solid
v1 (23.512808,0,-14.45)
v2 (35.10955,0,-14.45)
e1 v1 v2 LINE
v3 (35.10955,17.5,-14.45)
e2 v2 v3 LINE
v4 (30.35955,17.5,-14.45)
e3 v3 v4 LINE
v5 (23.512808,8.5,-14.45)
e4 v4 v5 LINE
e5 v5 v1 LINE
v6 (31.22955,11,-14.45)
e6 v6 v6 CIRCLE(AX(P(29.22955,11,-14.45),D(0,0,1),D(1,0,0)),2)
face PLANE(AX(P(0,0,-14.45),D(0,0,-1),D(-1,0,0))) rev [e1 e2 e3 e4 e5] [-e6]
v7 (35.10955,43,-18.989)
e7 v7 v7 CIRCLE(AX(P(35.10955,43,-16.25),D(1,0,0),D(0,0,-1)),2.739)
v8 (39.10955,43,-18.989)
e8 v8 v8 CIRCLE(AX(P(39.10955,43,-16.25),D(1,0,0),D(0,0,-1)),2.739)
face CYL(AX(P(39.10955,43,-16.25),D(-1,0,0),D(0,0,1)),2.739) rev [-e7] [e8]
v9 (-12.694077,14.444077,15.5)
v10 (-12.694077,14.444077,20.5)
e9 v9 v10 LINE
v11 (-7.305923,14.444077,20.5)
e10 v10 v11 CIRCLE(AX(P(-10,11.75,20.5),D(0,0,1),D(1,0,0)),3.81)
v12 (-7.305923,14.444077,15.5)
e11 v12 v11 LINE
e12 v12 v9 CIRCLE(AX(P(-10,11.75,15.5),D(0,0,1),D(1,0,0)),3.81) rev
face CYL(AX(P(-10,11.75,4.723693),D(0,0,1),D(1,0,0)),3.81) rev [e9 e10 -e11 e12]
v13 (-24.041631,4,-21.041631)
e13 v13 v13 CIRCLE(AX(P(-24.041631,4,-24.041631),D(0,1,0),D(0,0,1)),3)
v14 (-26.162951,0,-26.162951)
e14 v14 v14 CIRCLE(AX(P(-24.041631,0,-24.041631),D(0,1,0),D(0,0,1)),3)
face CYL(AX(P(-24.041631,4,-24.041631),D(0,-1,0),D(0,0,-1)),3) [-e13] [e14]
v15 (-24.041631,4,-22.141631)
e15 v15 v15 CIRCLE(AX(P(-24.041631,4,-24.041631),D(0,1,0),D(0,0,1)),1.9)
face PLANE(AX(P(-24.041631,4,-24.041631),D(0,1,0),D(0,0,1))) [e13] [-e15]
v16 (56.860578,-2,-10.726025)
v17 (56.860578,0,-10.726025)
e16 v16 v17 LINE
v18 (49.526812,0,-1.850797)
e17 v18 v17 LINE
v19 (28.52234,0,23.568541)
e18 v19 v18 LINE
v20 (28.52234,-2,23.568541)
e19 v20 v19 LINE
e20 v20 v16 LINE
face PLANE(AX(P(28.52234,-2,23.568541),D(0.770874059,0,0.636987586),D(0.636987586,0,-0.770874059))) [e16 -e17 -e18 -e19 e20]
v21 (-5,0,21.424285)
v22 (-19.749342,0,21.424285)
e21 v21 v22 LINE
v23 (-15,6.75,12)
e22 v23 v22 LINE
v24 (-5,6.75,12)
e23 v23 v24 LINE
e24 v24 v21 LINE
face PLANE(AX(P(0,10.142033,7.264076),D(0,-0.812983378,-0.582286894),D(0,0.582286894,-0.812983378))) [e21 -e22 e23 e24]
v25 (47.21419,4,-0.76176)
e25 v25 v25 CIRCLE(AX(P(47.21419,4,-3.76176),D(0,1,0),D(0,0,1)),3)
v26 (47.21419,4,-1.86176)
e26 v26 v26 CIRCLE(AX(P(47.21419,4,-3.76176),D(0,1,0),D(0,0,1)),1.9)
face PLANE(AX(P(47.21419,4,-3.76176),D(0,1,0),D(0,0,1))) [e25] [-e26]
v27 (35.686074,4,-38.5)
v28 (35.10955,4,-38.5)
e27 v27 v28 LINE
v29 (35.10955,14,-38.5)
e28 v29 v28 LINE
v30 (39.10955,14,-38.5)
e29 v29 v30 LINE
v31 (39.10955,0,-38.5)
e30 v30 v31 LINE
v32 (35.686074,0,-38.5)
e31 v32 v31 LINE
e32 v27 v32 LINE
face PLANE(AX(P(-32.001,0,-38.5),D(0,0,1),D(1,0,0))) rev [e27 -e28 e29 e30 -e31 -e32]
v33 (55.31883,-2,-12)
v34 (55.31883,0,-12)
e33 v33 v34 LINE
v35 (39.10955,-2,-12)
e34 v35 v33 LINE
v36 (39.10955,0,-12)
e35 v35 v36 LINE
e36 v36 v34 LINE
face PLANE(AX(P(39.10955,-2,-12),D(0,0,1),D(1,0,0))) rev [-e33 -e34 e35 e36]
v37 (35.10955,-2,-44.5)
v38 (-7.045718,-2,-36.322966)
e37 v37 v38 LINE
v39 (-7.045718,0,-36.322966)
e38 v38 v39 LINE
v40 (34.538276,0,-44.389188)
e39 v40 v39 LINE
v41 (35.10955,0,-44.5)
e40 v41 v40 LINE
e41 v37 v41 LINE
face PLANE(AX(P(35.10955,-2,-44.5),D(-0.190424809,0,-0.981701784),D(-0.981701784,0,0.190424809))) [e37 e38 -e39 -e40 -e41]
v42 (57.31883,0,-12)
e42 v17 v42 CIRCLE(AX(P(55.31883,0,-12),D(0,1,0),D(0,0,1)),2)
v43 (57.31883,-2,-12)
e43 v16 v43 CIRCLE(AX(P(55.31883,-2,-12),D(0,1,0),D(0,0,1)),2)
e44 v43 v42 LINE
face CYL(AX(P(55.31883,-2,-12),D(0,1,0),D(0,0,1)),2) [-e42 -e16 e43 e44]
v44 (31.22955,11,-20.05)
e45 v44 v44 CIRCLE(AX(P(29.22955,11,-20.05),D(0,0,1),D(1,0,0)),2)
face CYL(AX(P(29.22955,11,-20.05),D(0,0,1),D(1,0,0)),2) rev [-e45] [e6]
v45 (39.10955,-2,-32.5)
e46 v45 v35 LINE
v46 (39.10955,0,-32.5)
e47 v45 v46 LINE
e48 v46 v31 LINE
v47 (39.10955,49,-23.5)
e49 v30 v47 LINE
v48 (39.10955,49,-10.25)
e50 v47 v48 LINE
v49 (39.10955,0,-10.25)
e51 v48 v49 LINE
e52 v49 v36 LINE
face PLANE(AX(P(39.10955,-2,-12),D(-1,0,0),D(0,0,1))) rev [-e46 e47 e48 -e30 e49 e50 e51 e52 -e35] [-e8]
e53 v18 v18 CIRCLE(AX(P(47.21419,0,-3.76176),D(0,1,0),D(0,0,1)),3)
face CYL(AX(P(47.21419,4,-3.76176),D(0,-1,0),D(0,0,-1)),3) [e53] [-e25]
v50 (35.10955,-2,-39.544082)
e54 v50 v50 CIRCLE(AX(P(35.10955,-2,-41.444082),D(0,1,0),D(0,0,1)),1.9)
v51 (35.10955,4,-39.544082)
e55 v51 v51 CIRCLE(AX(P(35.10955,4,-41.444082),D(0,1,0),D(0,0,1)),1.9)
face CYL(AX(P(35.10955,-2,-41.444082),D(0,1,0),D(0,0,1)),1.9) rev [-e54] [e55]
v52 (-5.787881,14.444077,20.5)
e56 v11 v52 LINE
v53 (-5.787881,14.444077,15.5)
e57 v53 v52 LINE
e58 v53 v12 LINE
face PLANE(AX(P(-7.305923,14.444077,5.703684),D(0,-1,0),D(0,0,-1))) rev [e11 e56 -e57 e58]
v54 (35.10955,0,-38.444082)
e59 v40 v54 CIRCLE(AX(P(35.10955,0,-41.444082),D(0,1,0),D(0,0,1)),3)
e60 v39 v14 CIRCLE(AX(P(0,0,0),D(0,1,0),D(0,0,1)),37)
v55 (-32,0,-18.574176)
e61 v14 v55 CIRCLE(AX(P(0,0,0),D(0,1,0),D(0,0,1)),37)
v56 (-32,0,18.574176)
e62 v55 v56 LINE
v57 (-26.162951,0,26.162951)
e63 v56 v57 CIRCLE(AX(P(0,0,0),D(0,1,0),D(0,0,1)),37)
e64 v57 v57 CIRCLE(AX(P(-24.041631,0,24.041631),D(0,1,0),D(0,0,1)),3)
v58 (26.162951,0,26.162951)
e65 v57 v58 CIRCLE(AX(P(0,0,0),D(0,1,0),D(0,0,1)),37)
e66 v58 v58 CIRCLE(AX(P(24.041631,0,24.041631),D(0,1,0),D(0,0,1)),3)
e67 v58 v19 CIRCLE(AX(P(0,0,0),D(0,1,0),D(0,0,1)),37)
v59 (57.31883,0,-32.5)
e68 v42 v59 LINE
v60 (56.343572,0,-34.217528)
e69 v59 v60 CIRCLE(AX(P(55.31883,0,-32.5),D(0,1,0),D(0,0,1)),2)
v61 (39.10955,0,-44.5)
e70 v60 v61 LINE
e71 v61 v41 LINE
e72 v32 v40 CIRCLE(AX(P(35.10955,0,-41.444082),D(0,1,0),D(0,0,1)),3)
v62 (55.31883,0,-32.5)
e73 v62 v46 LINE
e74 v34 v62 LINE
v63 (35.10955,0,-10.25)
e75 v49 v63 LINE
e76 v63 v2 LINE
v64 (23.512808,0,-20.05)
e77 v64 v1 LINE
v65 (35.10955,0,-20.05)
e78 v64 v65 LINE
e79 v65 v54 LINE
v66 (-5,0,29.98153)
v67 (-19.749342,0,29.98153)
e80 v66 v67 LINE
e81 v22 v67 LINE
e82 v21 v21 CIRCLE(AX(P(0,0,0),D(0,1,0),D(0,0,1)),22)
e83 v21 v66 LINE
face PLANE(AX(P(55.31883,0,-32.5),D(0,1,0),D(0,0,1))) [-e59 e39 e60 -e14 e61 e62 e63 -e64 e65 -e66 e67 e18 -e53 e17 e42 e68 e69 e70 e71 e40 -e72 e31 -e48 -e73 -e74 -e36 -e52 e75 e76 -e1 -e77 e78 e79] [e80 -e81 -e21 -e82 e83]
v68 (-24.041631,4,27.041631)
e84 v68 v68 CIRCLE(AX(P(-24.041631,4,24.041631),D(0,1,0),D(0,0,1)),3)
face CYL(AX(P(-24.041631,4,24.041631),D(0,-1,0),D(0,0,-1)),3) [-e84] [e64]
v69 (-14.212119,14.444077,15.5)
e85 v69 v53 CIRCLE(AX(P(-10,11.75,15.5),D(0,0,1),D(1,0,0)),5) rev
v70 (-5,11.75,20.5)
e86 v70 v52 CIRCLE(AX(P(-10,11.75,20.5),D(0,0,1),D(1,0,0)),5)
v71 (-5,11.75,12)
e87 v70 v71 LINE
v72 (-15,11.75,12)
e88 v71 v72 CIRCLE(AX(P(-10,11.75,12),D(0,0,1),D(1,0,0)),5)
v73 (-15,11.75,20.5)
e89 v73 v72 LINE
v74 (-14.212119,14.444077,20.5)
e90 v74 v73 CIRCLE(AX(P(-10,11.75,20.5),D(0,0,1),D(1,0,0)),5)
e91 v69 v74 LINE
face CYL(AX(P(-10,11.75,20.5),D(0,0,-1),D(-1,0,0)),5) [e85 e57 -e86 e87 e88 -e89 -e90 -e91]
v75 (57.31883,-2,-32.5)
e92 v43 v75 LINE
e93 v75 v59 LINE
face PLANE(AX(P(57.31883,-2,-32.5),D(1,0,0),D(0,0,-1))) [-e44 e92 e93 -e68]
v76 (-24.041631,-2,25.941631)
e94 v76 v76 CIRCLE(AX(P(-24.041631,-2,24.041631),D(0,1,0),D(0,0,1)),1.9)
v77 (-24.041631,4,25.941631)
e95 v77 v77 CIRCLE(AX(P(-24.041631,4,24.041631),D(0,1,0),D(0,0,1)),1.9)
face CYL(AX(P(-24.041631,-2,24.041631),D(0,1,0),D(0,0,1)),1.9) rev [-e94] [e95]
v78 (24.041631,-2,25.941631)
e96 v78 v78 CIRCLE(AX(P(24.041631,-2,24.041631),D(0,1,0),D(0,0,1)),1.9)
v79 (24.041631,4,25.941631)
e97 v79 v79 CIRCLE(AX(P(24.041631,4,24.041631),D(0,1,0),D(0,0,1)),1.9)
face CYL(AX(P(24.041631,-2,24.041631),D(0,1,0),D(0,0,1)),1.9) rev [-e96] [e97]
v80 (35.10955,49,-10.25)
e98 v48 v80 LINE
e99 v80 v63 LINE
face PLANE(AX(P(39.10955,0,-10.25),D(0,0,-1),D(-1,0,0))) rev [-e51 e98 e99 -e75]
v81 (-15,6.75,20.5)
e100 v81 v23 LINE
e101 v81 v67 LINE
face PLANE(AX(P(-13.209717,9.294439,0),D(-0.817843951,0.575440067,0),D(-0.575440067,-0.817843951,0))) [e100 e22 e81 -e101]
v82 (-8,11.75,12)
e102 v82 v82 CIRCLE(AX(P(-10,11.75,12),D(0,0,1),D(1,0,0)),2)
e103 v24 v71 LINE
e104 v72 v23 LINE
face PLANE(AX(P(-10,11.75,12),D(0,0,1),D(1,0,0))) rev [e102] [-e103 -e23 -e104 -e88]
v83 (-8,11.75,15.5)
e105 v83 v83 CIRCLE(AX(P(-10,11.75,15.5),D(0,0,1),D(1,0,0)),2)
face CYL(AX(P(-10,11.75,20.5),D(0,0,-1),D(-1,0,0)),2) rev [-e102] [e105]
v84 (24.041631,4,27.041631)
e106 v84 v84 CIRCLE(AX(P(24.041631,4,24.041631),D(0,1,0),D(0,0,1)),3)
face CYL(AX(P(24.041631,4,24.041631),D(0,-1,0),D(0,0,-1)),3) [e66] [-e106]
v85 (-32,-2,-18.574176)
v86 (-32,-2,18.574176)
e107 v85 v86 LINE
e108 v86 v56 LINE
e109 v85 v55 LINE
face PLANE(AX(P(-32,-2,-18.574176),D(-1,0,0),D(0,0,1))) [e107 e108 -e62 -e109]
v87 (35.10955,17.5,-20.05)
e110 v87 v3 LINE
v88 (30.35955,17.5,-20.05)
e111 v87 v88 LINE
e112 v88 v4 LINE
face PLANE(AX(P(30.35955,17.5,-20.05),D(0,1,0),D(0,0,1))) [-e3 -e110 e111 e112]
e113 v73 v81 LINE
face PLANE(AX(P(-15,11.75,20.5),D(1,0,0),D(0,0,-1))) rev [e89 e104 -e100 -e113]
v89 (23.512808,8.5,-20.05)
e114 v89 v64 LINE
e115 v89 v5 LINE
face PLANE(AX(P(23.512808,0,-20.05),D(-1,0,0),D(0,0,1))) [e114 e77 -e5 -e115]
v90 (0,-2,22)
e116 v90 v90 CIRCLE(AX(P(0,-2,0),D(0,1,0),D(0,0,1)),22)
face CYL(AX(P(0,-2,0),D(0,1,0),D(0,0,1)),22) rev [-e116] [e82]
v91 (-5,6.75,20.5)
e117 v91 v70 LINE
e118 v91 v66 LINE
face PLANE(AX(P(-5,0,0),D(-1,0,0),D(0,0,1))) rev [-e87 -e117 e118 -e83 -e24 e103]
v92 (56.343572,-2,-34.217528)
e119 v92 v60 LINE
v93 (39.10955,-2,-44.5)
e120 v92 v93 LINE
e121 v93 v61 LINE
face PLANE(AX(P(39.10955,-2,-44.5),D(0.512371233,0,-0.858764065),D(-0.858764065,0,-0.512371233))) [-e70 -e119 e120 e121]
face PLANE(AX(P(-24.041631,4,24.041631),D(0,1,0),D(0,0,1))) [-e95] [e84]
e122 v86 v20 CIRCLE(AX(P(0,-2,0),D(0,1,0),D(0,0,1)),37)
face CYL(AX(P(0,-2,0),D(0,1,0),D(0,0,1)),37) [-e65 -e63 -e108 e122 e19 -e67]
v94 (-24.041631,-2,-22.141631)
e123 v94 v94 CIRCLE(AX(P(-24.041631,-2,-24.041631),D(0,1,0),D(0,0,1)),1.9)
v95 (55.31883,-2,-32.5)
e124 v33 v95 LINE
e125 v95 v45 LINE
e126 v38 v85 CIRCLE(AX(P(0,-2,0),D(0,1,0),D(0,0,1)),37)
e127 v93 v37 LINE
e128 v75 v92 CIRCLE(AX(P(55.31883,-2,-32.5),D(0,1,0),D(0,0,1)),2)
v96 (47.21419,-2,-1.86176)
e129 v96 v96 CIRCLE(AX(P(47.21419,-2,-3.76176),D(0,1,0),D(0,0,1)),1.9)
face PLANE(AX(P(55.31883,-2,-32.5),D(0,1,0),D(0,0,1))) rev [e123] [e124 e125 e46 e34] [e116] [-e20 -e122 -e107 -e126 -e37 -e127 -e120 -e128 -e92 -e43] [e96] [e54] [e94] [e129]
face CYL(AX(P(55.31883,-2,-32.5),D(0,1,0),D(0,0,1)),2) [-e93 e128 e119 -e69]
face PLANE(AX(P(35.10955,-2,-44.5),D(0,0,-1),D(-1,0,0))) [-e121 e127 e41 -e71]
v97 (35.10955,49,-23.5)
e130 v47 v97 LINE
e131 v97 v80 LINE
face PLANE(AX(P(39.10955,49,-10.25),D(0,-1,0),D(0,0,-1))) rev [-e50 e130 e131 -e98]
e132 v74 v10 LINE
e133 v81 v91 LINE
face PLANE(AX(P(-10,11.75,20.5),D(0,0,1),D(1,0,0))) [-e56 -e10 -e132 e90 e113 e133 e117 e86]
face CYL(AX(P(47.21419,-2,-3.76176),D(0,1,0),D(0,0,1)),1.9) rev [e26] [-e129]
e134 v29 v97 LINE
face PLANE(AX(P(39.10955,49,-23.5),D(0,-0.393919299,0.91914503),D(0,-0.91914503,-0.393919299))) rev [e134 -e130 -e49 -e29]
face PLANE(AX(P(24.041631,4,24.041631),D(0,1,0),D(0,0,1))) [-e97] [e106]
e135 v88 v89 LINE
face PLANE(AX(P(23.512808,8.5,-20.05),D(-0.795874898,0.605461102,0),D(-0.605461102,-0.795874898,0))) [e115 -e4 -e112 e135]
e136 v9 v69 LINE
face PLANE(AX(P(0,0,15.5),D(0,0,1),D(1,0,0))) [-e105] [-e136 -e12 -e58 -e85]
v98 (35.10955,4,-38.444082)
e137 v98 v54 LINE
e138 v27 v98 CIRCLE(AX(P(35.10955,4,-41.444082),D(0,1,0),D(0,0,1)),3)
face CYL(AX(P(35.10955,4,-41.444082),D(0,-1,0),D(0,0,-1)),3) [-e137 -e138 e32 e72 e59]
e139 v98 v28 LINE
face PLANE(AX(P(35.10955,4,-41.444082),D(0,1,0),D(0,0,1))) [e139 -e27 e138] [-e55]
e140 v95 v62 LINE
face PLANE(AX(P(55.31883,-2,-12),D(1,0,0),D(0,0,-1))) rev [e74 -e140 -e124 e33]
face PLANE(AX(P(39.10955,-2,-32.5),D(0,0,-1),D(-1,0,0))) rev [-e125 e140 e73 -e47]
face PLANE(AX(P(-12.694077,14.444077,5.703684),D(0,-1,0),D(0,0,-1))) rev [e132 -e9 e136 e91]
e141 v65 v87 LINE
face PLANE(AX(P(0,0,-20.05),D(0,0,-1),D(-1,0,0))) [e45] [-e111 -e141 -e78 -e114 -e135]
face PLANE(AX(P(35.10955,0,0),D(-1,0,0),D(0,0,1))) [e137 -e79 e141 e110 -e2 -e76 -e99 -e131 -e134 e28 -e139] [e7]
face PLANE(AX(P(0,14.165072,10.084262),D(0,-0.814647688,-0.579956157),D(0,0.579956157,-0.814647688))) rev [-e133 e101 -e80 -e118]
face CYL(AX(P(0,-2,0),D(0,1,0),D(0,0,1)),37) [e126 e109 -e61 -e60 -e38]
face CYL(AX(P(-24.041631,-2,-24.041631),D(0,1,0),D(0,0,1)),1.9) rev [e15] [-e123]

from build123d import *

# Parameters (mm, degrees)
SKETCH2_R                = 22
SKETCH2_W                = 16.20928
SKETCH2_H                = 20.5
BOSS_EXTRUDE1_DEPTH      = 2
SKETCH6_R                = 2
BOSS_EXTRUDE3_DEPTH      = 5.6
SKETCH7_R                = 2.739
BOSS_EXTRUDE4_DEPTH      = 4
BOSS_EXTRUDE5_DEPTH      = 5
BOSS_EXTRUDE5_DEPTH_BACK = 3.5
SKETCH9_R                = 2
LOFT4_START              = -19.749341788
LOFT4_DEPTH              = 14.749341788
LOFT4_START_2            = 11
LOFT4_2_DEPTH            = 20
CUT_EXTRUDE1_START       = -5
SKETCH11_R               = 3.81
CUT_EXTRUDE1_DEPTH       = 5
CUT_EXTRUDE2_REACH       = 99.148
SKETCH12_R               = 3
BOSS_EXTRUDE9_DEPTH      = 4
SKETCH14_R               = 1.9
CUT_EXTRUDE3_DEPTH       = 86.385585859
CUT_EXTRUDE5_START       = -5
CUT_EXTRUDE5_DEPTH       = 5


with BuildPart() as part:
    # Sketch2 → Boss-Extrude1 (new body)
    with BuildSketch(Plane(origin=(0, 0, 0), x_dir=(1, 0, 0), z_dir=(0, 1, 0))):
        with BuildLine():
            Line((35.10955, 44.5), (-7.045717951, 36.322965993))
            ThreePointArc((-7.045717951, 36.322965993), (-21.445207215, 30.151336413), (-32, 18.574175621))
            Line((-32, 18.574175621), (-32, -18.574175621))
            ThreePointArc((-32, -18.574175621), (-3.042934445, -36.874659998), (28.522340191, -23.568540685))
            Line((28.522340191, -23.568540685), (56.860578118, 10.726024828))
            ThreePointArc((56.860578118, 10.726024828), (57.200783272, 11.323056958), (57.31883, 12))
            Line((57.31883, 12), (57.31883, 32.5))
            ThreePointArc((57.31883, 32.5), (57.058008676, 33.487551282), (56.343572466, 34.21752813))
            Line((56.343572466, 34.21752813), (39.10955, 44.5))
            Line((39.10955, 44.5), (35.10955, 44.5))
        make_face()
        with Locations(Location((0, 0, 0), (0, 0, 270))):
            Circle(SKETCH2_R, mode=Mode.SUBTRACT)
        with Locations((47.21419, 22.25)):
            Rectangle(SKETCH2_W, SKETCH2_H, mode=Mode.SUBTRACT)
    extrude(amount=-BOSS_EXTRUDE1_DEPTH)

    # Sketch6 → Boss-Extrude3 (add)
    with BuildSketch(Plane.XY.offset(-14.45)):
        Polygon((23.512808221, 0), (23.512808221, 8.5), (30.35955, 17.5), (35.10955, 17.5), (35.10955, 0), align=None)
        with Locations((29.22955, 11)):
            Circle(SKETCH6_R, mode=Mode.SUBTRACT)
    extrude(amount=-BOSS_EXTRUDE3_DEPTH)

    # Sketch7 → Boss-Extrude4 (add)
    with BuildSketch(Plane(origin=(35.10955, 0, 0), x_dir=(0, 0, -1), z_dir=(1, 0, 0))):
        Polygon((44.5, 0), (10.25, 0), (10.25, 49), (23.5, 49), align=None)
        with Locations((16.25, 43)):
            Circle(SKETCH7_R, mode=Mode.SUBTRACT)
    extrude(amount=BOSS_EXTRUDE4_DEPTH)



with BuildPart() as body_2:
    # Sketch9 → Boss-Extrude5 (new, two sides: drawn at the far end of the back side and taken through both)
    with BuildSketch(Plane.XY.offset(15.5).offset(-BOSS_EXTRUDE5_DEPTH_BACK)):
        with BuildLine():
            Line((-15, 11.75), (-15, 6.75))
            Line((-15, 6.75), (-10, 6.75))
            Line((-10, 6.75), (-5, 6.75))
            Line((-5, 6.75), (-5, 11.75))
            ThreePointArc((-5, 11.75), (-10, 16.75), (-15, 11.75))
        make_face()
        with Locations((-10, 11.75)):
            Circle(SKETCH9_R, mode=Mode.SUBTRACT)
    extrude(amount=BOSS_EXTRUDE5_DEPTH + BOSS_EXTRUDE5_DEPTH_BACK)


with BuildPart() as part_1:
    add(part.part)

    add(body_2.part)  # Loft4 merges body 2
    # Loft4: read off the stored shape, not the designer's step
    # Loft4 outline → Loft4 (add)
    with BuildSketch(Plane.YZ.offset(LOFT4_START)):
        Polygon((6.75, 20.5), (0, 29.981530337), (0, 21.424285286), (6.75, 12), align=None)
    extrude(amount=LOFT4_DEPTH)

    # Loft4 2 outline → Loft4 2 (cut)
    with BuildSketch(Plane.XY.offset(LOFT4_START_2)):
        Polygon((-19.749341788, 0), (-15, 6.75), (-19.749341788, 6.75), align=None)
    extrude(amount=LOFT4_2_DEPTH, mode=Mode.SUBTRACT)

    # Sketch11 → Cut-Extrude1 (cut)
    with BuildSketch(Plane.XY.offset(20.5).offset(CUT_EXTRUDE1_START)):
        with Locations((-10, 11.75)):
            Circle(SKETCH11_R)
    extrude(amount=CUT_EXTRUDE1_DEPTH, mode=Mode.SUBTRACT)

    # Sketch13 → Cut-Extrude2 (cut, up to next)
    with BuildSketch(Plane(origin=(39.10955, 0, 0), x_dir=(0, 0, -1), z_dir=(1, 0, 0)), mode=Mode.PRIVATE) as cut_extrude2_sk1:
        Polygon((44.5, 0), (38.5, 0), (38.5, 14), align=None)
    cut_extrude2_tool1 = extrude(cut_extrude2_sk1.sketch, amount=-CUT_EXTRUDE2_REACH, mode=Mode.PRIVATE) & part_1.part
    add(cut_extrude2_tool1.solids().sort_by_distance((39.10955, 4.666667, -40.5))[0], mode=Mode.SUBTRACT)

    # Sketch12 → Boss-Extrude9 (add)
    with BuildSketch(Plane(origin=(0, 0, 0), x_dir=(1, 0, 0), z_dir=(0, 1, 0))):
        with Locations(Location((-24.04163056, 24.04163056, 0), (0, 0, 134.999512051))):
            Circle(SKETCH12_R)
        with Locations(Location((-24.04163056, -24.04163056, 0), (0, 0, 224.999512051))):
            Circle(SKETCH12_R)
        with Locations(Location((24.04163056, -24.04163056, 0), (0, 0, 314.999512068))):
            Circle(SKETCH12_R)
        with Locations(Location((47.21419, 3.761759805, 0), (0, 0, 320.432443614))):
            Circle(SKETCH12_R)
        with Locations((35.10955, 41.444082154)):
            Circle(SKETCH12_R)
    extrude(amount=BOSS_EXTRUDE9_DEPTH)

    # Sketch14 → Cut-Extrude3 (cut, through all)
    with BuildSketch(Plane(origin=(0, 4, 0), x_dir=(1, 0, 0), z_dir=(0, 1, 0))):
        with Locations(Location((-24.04163056, 24.04163056, 0), (0, 0, 270))):
            Circle(SKETCH14_R)
        with Locations(Location((35.10955, 41.444082154, 0), (0, 0, 270))):
            Circle(SKETCH14_R)
        with Locations(Location((47.21419, 3.761759805, 0), (0, 0, 270))):
            Circle(SKETCH14_R)
        with Locations(Location((24.04163056, -24.04163056, 0), (0, 0, 270))):
            Circle(SKETCH14_R)
        with Locations(Location((-24.04163056, -24.04163056, 0), (0, 0, 270))):
            Circle(SKETCH14_R)
    extrude(amount=-CUT_EXTRUDE3_DEPTH, mode=Mode.SUBTRACT)

    # Sketch18 → Cut-Extrude5 (cut)
    with BuildSketch(Plane.XY.offset(20.5).offset(CUT_EXTRUDE5_START)):
        with BuildLine():
            Line((-10, 11.75), (-12.694076836, 14.444076836))
            Line((-12.694076836, 14.444076836), (-14.212119419, 14.444076836))
            ThreePointArc((-14.212119419, 14.444076836), (-10, 16.75), (-5.787880581, 14.444076836))
            Line((-5.787880581, 14.444076836), (-7.305923164, 14.444076836))
            Line((-7.305923164, 14.444076836), (-10, 11.75))
        make_face()
    extrude(amount=CUT_EXTRUDE5_DEPTH, mode=Mode.SUBTRACT)


solid = part_1.part
